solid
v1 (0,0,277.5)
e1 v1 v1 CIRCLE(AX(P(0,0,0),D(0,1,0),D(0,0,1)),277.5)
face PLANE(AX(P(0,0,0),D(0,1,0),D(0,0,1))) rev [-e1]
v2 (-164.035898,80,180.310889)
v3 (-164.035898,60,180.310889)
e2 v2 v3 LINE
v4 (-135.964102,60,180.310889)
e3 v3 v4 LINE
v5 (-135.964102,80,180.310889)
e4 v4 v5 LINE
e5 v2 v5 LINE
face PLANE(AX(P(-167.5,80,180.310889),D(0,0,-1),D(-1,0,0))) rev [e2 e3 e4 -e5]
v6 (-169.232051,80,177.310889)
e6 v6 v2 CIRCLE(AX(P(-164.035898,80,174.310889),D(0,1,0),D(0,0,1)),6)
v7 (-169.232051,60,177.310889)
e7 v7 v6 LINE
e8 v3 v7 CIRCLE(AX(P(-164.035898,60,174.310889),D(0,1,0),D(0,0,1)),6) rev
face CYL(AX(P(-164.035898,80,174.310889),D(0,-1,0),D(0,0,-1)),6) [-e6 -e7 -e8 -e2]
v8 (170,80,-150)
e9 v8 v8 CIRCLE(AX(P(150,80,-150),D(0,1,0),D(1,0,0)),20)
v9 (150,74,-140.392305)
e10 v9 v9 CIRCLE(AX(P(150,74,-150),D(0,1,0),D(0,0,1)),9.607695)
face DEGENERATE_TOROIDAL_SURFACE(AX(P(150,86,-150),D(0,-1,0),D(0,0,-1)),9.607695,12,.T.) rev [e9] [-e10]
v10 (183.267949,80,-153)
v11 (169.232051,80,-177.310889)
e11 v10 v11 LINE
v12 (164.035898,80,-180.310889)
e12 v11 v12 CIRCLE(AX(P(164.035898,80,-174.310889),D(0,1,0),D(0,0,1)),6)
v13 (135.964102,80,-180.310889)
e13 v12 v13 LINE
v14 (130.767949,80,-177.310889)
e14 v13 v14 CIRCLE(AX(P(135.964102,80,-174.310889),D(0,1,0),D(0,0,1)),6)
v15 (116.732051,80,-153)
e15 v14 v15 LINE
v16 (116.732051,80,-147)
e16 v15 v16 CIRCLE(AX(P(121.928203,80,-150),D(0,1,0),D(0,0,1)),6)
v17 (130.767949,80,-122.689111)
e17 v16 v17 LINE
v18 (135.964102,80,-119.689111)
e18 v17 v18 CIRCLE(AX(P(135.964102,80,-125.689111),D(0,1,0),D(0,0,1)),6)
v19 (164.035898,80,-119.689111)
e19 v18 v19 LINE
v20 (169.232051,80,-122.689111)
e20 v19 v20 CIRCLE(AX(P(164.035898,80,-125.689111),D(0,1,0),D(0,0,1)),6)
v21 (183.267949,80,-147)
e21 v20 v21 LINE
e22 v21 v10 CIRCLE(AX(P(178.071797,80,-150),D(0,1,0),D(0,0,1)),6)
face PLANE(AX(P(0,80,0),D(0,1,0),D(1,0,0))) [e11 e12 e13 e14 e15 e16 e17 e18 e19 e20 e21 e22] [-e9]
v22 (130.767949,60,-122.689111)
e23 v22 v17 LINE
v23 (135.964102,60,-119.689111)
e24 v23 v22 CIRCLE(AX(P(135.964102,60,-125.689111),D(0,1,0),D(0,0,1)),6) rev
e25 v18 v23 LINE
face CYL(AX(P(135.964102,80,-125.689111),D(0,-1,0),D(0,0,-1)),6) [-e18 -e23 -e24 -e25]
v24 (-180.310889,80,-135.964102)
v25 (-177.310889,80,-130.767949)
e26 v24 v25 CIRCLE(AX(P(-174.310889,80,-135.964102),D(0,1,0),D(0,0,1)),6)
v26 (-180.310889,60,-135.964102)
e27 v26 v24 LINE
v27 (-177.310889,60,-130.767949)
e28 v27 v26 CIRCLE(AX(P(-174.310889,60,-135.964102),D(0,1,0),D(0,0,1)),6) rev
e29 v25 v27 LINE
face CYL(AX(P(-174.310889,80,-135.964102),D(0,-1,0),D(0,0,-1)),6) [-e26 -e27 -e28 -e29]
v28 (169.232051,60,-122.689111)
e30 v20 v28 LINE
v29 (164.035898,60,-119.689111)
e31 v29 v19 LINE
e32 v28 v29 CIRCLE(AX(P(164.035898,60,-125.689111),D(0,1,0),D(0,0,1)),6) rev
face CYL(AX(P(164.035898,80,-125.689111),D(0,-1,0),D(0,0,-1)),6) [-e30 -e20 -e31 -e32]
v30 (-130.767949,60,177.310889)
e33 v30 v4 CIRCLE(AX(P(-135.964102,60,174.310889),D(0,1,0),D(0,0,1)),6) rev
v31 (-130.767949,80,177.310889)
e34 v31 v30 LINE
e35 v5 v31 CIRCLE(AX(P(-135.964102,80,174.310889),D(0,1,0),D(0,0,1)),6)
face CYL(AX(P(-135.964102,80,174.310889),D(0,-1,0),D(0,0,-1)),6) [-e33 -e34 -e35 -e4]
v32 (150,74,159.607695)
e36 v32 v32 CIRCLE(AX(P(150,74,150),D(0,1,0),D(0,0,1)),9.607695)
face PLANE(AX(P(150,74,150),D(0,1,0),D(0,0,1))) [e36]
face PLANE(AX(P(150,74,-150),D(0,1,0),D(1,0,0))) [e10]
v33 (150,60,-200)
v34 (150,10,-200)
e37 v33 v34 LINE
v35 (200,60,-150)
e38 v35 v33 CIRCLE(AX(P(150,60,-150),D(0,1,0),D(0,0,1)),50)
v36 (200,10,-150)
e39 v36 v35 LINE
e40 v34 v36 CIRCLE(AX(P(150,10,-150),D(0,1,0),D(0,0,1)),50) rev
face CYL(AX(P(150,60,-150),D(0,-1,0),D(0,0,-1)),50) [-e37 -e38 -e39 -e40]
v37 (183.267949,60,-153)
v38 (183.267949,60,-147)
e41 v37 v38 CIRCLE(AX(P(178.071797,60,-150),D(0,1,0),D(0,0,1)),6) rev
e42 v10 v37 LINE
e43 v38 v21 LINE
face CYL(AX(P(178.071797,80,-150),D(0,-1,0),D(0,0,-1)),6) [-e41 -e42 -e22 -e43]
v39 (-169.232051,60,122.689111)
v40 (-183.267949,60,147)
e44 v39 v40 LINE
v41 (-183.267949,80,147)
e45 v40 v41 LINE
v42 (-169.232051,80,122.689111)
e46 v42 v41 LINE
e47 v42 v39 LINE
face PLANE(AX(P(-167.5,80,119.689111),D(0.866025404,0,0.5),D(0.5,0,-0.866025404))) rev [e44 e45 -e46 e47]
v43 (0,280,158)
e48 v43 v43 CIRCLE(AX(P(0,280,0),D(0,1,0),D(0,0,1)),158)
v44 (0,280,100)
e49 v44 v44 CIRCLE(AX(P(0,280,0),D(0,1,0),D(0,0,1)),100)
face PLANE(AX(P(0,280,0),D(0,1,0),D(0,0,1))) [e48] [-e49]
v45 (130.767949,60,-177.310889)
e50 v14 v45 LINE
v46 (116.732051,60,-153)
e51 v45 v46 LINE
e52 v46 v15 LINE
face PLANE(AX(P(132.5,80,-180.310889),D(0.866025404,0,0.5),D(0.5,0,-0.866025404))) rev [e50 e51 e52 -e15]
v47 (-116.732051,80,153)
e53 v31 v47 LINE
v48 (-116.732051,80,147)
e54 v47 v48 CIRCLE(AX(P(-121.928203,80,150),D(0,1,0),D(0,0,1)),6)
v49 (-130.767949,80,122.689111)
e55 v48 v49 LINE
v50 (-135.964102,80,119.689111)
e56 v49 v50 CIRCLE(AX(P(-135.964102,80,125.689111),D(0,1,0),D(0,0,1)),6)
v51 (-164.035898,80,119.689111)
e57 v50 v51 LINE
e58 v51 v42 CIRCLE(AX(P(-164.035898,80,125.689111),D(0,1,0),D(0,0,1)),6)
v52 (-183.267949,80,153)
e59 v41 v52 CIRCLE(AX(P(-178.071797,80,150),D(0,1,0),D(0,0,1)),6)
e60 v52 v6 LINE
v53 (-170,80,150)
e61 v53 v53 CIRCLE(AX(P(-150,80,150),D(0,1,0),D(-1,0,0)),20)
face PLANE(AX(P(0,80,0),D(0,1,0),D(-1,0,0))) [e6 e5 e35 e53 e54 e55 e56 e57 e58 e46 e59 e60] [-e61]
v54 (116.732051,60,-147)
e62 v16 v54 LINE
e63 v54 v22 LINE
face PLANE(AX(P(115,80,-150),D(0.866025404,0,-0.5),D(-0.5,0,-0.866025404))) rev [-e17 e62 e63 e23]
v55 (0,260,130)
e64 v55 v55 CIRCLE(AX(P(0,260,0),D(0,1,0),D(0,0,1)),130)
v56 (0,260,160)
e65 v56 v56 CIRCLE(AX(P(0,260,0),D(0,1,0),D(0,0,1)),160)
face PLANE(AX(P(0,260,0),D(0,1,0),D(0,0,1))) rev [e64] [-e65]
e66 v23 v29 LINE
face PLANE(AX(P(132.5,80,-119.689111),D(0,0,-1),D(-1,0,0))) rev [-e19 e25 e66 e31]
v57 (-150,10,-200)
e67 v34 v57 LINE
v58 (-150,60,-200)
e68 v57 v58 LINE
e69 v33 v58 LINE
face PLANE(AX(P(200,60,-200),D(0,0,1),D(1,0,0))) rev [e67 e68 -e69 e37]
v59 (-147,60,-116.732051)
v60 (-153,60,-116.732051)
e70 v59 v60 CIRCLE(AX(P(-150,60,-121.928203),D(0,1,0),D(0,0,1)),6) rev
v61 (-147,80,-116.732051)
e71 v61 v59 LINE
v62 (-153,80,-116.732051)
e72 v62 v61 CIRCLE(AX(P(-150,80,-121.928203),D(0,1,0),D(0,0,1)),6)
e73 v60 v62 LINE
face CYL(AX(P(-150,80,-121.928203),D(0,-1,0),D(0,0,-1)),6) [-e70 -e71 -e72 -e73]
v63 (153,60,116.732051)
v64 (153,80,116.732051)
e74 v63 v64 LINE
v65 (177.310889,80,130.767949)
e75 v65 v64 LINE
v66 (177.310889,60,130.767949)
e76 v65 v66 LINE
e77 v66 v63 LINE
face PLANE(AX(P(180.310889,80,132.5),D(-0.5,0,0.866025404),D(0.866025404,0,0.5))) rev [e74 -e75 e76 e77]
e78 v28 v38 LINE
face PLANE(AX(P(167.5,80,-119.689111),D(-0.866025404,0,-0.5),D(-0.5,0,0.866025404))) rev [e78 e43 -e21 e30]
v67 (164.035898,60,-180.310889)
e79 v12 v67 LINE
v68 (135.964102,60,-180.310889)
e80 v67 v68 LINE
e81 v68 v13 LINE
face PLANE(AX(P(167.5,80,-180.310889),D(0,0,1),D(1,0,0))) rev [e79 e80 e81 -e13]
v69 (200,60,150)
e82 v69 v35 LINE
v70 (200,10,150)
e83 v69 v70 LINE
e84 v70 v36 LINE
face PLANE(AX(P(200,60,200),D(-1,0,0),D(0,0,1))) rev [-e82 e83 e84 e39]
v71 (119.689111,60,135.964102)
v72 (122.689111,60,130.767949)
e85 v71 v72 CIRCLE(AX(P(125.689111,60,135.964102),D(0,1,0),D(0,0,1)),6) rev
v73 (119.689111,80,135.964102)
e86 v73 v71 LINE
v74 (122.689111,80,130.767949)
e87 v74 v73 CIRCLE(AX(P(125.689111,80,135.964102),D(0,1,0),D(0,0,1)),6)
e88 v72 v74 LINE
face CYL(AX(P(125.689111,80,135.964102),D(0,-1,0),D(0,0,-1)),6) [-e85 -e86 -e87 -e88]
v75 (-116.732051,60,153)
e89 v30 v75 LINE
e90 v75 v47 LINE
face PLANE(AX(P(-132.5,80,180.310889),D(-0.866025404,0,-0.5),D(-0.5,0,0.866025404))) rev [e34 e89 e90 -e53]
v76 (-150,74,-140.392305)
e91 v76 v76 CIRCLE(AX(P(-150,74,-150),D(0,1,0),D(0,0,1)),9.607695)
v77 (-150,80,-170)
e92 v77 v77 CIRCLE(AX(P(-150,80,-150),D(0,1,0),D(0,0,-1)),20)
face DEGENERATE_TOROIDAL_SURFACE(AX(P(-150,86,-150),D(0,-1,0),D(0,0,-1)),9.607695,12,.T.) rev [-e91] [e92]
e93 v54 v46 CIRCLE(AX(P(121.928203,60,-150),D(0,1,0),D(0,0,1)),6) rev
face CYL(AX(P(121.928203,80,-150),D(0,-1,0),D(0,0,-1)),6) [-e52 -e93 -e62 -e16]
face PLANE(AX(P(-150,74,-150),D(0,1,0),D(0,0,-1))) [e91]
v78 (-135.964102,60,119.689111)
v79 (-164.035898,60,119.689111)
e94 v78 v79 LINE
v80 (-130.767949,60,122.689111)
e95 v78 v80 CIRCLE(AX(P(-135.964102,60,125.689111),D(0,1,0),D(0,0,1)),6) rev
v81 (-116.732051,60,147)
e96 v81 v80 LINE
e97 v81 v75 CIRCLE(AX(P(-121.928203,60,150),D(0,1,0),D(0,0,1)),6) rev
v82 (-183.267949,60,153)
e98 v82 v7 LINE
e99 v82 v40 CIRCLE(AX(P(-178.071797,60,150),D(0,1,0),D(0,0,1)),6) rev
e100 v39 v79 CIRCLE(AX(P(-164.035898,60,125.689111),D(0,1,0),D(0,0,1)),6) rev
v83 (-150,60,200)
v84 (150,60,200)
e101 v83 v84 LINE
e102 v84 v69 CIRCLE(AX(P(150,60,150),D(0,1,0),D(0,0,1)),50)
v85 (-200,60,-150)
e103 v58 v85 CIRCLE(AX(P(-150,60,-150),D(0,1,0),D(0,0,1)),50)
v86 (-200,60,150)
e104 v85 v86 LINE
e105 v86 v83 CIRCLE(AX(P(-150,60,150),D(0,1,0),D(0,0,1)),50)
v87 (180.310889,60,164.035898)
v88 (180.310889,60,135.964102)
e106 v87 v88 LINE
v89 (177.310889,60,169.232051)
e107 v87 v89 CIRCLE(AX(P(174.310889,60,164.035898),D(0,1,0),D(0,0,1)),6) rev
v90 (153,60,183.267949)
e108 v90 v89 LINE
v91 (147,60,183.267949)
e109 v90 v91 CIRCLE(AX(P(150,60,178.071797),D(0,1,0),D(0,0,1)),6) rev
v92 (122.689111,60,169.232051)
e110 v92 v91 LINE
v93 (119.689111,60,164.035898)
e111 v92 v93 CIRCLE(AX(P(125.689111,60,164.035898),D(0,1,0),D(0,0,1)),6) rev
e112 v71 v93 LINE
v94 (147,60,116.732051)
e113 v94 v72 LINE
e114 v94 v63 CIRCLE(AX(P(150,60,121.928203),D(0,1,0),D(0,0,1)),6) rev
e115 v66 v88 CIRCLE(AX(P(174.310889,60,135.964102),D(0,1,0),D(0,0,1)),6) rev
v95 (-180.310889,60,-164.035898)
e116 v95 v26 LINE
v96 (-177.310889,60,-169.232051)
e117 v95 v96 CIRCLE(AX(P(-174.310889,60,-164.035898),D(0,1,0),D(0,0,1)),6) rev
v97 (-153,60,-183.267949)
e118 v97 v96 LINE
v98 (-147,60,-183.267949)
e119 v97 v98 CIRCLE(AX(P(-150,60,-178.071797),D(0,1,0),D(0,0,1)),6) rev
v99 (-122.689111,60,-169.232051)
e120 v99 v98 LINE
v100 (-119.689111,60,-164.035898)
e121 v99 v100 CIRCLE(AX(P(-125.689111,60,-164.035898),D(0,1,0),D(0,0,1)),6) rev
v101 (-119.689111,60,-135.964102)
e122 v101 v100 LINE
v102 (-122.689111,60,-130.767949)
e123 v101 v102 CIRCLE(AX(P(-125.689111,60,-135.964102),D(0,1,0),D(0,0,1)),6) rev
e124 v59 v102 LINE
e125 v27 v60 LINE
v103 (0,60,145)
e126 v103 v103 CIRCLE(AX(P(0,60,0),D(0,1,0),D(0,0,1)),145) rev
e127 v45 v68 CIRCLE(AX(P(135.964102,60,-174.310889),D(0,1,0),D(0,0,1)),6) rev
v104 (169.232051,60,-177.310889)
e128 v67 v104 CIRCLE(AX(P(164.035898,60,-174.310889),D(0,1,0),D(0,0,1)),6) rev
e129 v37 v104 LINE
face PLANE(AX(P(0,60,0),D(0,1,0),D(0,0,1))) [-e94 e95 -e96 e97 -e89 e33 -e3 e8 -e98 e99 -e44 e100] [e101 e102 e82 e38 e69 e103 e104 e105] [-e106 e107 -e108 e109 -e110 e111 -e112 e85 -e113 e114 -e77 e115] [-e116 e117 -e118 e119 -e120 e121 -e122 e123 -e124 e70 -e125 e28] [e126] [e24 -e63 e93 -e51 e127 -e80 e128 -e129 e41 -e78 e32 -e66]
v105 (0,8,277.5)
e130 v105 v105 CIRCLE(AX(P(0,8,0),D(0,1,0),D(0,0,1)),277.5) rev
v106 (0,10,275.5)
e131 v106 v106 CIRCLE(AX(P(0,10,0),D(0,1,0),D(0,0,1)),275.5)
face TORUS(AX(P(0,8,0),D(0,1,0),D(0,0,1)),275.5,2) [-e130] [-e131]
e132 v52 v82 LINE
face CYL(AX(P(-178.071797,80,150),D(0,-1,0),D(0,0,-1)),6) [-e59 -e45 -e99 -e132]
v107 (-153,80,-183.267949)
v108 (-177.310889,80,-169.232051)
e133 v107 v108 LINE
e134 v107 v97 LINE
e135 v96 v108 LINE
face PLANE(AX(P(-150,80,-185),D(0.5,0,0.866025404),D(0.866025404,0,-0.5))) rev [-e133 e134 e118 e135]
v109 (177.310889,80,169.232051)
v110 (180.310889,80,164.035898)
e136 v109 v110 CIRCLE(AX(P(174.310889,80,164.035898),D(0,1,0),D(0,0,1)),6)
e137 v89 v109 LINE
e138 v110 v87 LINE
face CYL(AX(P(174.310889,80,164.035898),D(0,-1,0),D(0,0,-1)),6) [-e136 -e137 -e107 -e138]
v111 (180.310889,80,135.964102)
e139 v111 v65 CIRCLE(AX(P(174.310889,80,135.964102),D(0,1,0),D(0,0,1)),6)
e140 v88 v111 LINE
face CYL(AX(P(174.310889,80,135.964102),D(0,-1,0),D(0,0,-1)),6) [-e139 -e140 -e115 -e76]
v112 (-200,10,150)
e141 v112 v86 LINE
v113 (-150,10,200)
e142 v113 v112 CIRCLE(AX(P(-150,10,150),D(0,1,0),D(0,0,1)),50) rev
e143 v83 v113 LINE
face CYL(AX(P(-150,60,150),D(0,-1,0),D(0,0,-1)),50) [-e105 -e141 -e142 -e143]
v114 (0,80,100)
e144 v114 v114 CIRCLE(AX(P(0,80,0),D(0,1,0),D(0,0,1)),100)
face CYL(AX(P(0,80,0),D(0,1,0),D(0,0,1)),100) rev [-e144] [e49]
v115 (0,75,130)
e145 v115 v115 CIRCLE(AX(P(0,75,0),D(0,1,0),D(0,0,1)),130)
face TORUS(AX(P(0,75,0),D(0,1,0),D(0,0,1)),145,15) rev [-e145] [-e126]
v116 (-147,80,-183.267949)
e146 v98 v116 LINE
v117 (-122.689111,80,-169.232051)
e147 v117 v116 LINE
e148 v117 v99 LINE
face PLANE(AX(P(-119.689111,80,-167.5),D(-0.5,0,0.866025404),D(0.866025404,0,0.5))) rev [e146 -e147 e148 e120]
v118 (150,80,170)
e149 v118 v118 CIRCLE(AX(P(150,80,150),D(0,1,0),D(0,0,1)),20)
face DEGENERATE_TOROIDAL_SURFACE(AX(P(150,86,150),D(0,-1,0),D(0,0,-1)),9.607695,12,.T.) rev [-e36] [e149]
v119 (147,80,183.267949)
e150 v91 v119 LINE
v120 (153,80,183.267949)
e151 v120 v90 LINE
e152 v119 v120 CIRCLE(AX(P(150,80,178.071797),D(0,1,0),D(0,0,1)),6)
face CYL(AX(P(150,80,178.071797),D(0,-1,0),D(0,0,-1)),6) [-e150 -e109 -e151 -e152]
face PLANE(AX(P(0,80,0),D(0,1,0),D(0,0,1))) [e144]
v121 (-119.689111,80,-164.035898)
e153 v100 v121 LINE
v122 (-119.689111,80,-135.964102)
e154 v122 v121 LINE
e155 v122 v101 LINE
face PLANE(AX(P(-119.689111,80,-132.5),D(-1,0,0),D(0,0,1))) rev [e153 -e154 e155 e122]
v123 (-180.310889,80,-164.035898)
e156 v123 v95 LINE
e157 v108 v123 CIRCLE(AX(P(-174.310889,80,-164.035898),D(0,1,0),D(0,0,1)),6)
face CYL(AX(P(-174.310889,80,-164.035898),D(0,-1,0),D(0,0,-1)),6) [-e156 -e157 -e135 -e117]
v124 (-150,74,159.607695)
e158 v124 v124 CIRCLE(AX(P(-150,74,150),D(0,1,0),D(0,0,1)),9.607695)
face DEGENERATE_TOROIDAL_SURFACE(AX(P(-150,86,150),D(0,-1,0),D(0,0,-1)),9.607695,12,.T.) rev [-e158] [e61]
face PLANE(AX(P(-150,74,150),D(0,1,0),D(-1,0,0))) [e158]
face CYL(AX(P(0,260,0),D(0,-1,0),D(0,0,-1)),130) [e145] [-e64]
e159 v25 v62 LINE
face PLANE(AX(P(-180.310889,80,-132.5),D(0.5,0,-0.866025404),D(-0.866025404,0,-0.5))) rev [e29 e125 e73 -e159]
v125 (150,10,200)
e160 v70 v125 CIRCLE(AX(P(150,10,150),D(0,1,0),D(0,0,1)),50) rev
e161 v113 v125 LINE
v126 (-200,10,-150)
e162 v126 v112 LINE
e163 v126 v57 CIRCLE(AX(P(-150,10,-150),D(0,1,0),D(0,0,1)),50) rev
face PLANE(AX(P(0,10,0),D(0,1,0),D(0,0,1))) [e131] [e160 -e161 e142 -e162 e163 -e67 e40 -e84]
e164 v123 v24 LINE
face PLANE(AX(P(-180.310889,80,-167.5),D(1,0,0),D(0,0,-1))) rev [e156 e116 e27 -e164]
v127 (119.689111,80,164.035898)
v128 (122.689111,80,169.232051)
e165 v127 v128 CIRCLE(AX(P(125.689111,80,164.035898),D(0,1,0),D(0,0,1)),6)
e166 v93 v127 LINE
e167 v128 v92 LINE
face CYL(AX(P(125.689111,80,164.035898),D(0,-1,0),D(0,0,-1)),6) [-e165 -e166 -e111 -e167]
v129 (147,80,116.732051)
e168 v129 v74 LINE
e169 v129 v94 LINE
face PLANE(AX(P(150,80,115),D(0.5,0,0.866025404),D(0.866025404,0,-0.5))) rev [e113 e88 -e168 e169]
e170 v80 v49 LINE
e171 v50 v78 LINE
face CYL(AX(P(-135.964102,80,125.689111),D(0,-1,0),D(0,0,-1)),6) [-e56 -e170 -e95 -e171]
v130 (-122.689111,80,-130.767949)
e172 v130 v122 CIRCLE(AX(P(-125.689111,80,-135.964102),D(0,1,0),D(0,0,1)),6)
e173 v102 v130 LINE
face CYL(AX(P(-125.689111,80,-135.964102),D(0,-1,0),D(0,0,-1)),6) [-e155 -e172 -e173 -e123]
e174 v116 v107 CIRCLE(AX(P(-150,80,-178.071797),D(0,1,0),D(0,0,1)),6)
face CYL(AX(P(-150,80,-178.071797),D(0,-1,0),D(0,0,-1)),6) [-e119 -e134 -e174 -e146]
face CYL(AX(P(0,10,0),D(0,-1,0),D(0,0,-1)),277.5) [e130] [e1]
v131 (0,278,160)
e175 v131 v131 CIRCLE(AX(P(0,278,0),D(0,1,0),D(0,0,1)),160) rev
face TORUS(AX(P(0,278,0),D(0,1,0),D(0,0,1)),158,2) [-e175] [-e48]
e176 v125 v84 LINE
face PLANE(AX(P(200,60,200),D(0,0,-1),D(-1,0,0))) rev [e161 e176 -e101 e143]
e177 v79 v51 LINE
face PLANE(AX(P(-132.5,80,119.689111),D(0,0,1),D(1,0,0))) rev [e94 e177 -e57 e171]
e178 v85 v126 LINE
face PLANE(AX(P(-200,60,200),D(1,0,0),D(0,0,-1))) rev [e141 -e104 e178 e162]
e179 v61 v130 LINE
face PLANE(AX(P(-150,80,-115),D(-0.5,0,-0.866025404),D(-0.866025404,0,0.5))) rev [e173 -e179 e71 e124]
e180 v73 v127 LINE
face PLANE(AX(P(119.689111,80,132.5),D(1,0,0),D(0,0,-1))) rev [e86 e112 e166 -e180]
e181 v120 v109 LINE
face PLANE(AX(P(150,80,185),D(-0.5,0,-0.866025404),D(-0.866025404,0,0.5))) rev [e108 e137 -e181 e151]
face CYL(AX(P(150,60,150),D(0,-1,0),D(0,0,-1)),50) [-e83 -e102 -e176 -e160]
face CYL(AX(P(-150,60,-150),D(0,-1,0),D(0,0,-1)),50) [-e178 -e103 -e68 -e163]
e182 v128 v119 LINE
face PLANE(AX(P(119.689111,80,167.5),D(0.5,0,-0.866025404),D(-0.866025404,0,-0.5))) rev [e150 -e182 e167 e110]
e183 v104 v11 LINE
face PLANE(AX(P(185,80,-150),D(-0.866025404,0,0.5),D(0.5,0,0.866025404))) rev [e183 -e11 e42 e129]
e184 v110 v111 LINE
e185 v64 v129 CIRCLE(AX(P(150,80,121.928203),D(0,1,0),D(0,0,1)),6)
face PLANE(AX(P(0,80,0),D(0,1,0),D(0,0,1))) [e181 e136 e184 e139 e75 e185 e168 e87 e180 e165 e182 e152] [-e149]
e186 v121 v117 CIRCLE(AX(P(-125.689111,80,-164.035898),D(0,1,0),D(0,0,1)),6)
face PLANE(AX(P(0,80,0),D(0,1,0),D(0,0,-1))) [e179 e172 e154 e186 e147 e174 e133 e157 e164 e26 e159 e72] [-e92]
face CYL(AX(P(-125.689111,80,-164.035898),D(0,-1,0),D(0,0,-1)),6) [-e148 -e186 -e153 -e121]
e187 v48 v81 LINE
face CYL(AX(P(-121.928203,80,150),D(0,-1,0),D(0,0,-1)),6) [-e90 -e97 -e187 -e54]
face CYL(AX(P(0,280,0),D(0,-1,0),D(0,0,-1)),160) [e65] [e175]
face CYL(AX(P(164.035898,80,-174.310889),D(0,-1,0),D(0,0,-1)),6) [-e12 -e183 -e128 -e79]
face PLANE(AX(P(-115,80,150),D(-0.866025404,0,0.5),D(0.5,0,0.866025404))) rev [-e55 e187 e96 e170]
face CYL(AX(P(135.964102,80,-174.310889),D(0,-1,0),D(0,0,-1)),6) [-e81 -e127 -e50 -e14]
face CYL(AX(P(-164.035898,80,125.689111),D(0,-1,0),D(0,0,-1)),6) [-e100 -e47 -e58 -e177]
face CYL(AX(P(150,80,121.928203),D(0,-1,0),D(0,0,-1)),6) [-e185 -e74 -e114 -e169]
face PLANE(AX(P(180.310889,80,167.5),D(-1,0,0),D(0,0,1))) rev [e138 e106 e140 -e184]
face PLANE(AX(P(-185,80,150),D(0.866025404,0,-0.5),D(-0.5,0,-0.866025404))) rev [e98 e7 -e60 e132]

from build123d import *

# Parameters (mm, degrees)
SKETCH1_R                = 277.5
BOSS_EXTRUDE1_DEPTH      = 10
SKETCH2_W                = 400
SKETCH2_H                = 400
BOSS_EXTRUDE2_DEPTH      = 50
FILLET1_R                = 50
SKETCH3_R                = 130
BOSS_EXTRUDE3_DEPTH      = 200
SKETCH4_R                = 160
BOSS_EXTRUDE4_DEPTH      = 20
SKETCH7_R                = 100
CUT_EXTRUDE2_DEPTH       = 200
FILLET3_R                = 15
FILLET4_R                = 2
BOSS_EXTRUDE6_DEPTH      = 20
SKETCH9_R                = 20
CUT_EXTRUDE3_DEPTH       = 6
FILLET5_R                = 12
FILLET6_R                = 6
CIRPATTERN1_COUNT        = 4
FILLET5_OF_CIRPATTERN1_R = 12
FILLET6_OF_CIRPATTERN1_R = 6


with BuildPart() as part:
    # Sketch1 → Boss-Extrude1 (new body)
    with BuildSketch(Plane(origin=(0, 0, 0), x_dir=(1, 0, 0), z_dir=(0, 1, 0))):
        with Locations(Location((0, 0, 0), (0, 0, 270))):
            Circle(SKETCH1_R)
    extrude(amount=BOSS_EXTRUDE1_DEPTH)

    # Sketch2 → Boss-Extrude2 (add)
    with BuildSketch(Plane(origin=(0, 10, 0), x_dir=(1, 0, 0), z_dir=(0, 1, 0))):
        Rectangle(SKETCH2_W, SKETCH2_H)
    extrude(amount=BOSS_EXTRUDE2_DEPTH)

    # Fillet1
    # the kernel refuses this fillet: 50 mm, written as the material it takes off along each edge
    with BuildSketch(Plane(origin=(-200, 10, -200), x_dir=(0, 0, 1), z_dir=(0, 1, 0)), Plane(origin=(-200, 10, 200), x_dir=(1, 0, 0), z_dir=(0, 1, 0)), Plane(origin=(200, 10, -200), x_dir=(-1, 0, 0), z_dir=(0, 1, 0))) as fillet1_piece_1:
        with BuildLine():
            CenterArc((FILLET1_R, FILLET1_R), FILLET1_R, 180, 90)
            Line((0, FILLET1_R), (0, 0))
            Line((0, 0), (FILLET1_R, 0))
        make_face()
    extrude(amount=175, mode=Mode.SUBTRACT)
    with BuildSketch(Plane(origin=(200, 10, 200), x_dir=(-1, 0, 0), z_dir=(0, 1, 0))) as fillet1_piece_2:
        with BuildLine():
            CenterArc((FILLET1_R, -FILLET1_R), FILLET1_R, 90, 90)
            Line((0, -FILLET1_R), (0, 0))
            Line((0, 0), (FILLET1_R, 0))
        make_face()
    extrude(amount=175, mode=Mode.SUBTRACT)

    # Sketch3 → Boss-Extrude3 (add)
    with BuildSketch(Plane(origin=(0, 60, 0), x_dir=(1, 0, 0), z_dir=(0, 1, 0))):
        with Locations(Location((0, 0, 0), (0, 0, 270))):
            Circle(SKETCH3_R)
    extrude(amount=BOSS_EXTRUDE3_DEPTH)

    # Sketch4 → Boss-Extrude4 (add)
    with BuildSketch(Plane(origin=(0, 260, 0), x_dir=(1, 0, 0), z_dir=(0, 1, 0))):
        with Locations(Location((0, 0, 0), (0, 0, 270))):
            Circle(SKETCH4_R)
    extrude(amount=BOSS_EXTRUDE4_DEPTH)

    # Sketch7 → Cut-Extrude2 (cut)
    with BuildSketch(Plane(origin=(0, 280, 0), x_dir=(1, 0, 0), z_dir=(0, 1, 0))):
        with Locations(Location((0, 0, 0), (0, 0, 270))):
            Circle(SKETCH7_R)
    extrude(amount=-CUT_EXTRUDE2_DEPTH, mode=Mode.SUBTRACT)

    # Fillet3
    fillet3_edges = [part.edges().sort_by_distance(p)[0] for p in [
        (0, 60, -130),
    ]]
    fillet(fillet3_edges, radius=FILLET3_R)

    # Fillet4
    fillet4_edges = [part.edges().sort_by_distance(p)[0] for p in [
        (0, 10, -277.5),
        (0, 280, -160),
    ]]
    fillet(fillet4_edges, radius=FILLET4_R)

    # Sketch8 → Boss-Extrude6 (add)
    with BuildSketch(Plane(origin=(0, 60, 0), x_dir=(1, 0, 0), z_dir=(0, 1, 0))):
        Polygon((150, -185), (180.310889132, -167.5), (180.310889132, -132.5), (150, -115), (119.689110868, -132.5), (119.689110868, -167.5), align=None)
    boss_extrude6 = extrude(amount=BOSS_EXTRUDE6_DEPTH)

    # Sketch9 → Cut-Extrude3 (cut)
    with BuildSketch(Plane(origin=(0, 80, 0), x_dir=(1, 0, 0), z_dir=(0, 1, 0))):
        with Locations(Location((150, -150, 0), (0, 0, 270))):
            Circle(SKETCH9_R)
    cut_extrude3 = extrude(amount=-CUT_EXTRUDE3_DEPTH, mode=Mode.SUBTRACT)

    # Fillet5
    # the kernel refuses this fillet: 12 mm, written as the material it adds along each edge
    with BuildSketch(Plane(origin=(150, 74, 150), x_dir=(0, 0, 1), z_dir=(-1, 0, 0))) as fillet5_piece_1:
        with BuildLine():
            CenterArc((9.607695155, 12), FILLET5_R, 270, 60)
            Line((9.607695155, 0), (9.607695155, -0.24))
            Line((9.607695155, -0.24), (20, -0.24))
            Line((20, -0.24), (20.24, 0))
            ThreePointArc((20.24, 0), (20.24, 3), (20.207846097, 5.88))
            Line((20.207846097, 5.88), (20, 6))
        make_face()
    revolve(axis=Axis((150, 74, 150), (0, 1, 0)))

    # Fillet6
    fillet6_edges = [part.edges().sort_by_distance(p)[0] for p in [
        (119.689110868, 70, 167.5),
        (150, 70, 185),
        (180.310889132, 70, 167.5),
        (180.310889132, 70, 132.5),
        (150, 70, 115),
        (119.689110868, 70, 132.5),
    ]]
    fillet(fillet6_edges, radius=FILLET6_R)

    # CirPattern1: Boss-Extrude6, Cut-Extrude3 ×4 about axis
    cirpattern1_axis = Axis((0, 0, 0), (0, 1, 0))
    add([boss_extrude6.rotate(cirpattern1_axis, i * 360 / CIRPATTERN1_COUNT) for i in range(1, CIRPATTERN1_COUNT)])
    add([cut_extrude3.rotate(cirpattern1_axis, i * 360 / CIRPATTERN1_COUNT) for i in range(1, CIRPATTERN1_COUNT)], mode=Mode.SUBTRACT)

    # Fillet5 of CirPattern1
    # the kernel refuses this fillet: 12 mm, written as the material it adds along each edge
    with BuildSketch(Plane(origin=(150, 74, -150), x_dir=(1, 0, 0), z_dir=(0, 0, 1))) as fillet5_of_cirpattern1_piece_1:
        with BuildLine():
            CenterArc((9.607695155, 12), FILLET5_OF_CIRPATTERN1_R, 270, 60)
            Line((9.607695155, 0), (9.607695155, -0.24))
            Line((9.607695155, -0.24), (20, -0.24))
            Line((20, -0.24), (20.24, 0))
            ThreePointArc((20.24, 0), (20.24, 3), (20.207846097, 5.88))
            Line((20.207846097, 5.88), (20, 6))
        make_face()
    revolve(axis=Axis((150, 74, -150), (0, 1, 0)))
    with BuildSketch(Plane(origin=(-150, 74, -150), x_dir=(0, 0, -1), z_dir=(1, 0, 0))) as fillet5_of_cirpattern1_piece_2:
        with BuildLine():
            CenterArc((9.607695155, 12), FILLET5_OF_CIRPATTERN1_R, 270, 60)
            Line((9.607695155, 0), (9.607695155, -0.24))
            Line((9.607695155, -0.24), (20, -0.24))
            Line((20, -0.24), (20.24, 0))
            ThreePointArc((20.24, 0), (20.24, 3), (20.207846097, 5.88))
            Line((20.207846097, 5.88), (20, 6))
        make_face()
    revolve(axis=Axis((-150, 74, -150), (0, 1, 0)))
    with BuildSketch(Plane(origin=(-150, 74, 150), x_dir=(-1, 0, 0), z_dir=(0, 0, -1))) as fillet5_of_cirpattern1_piece_3:
        with BuildLine():
            CenterArc((9.607695155, 12), FILLET5_OF_CIRPATTERN1_R, 270, 60)
            Line((9.607695155, 0), (9.607695155, -0.24))
            Line((9.607695155, -0.24), (20, -0.24))
            Line((20, -0.24), (20.24, 0))
            ThreePointArc((20.24, 0), (20.24, 3), (20.207846097, 5.88))
            Line((20.207846097, 5.88), (20, 6))
        make_face()
    revolve(axis=Axis((-150, 74, 150), (0, 1, 0)))

    # Fillet6 of CirPattern1
    fillet6_of_cirpattern1_edges = [part.edges().sort_by_distance(p)[0] for p in [
        (167.5, 70, -119.689110868),
        (185, 70, -150),
        (167.5, 70, -180.310889132),
        (132.5, 70, -180.310889132),
        (115, 70, -150),
        (132.5, 70, -119.689110868),
        (-119.689110868, 70, -167.5),
        (-150, 70, -185),
        (-180.310889132, 70, -167.5),
        (-180.310889132, 70, -132.5),
        (-150, 70, -115),
        (-119.689110868, 70, -132.5),
        (-167.5, 70, 119.689110868),
        (-185, 70, 150),
        (-167.5, 70, 180.310889132),
        (-132.5, 70, 180.310889132),
        (-115, 70, 150),
        (-132.5, 70, 119.689110868),
    ]]
    fillet(fillet6_of_cirpattern1_edges, radius=FILLET6_OF_CIRPATTERN1_R)


solid = part.part
